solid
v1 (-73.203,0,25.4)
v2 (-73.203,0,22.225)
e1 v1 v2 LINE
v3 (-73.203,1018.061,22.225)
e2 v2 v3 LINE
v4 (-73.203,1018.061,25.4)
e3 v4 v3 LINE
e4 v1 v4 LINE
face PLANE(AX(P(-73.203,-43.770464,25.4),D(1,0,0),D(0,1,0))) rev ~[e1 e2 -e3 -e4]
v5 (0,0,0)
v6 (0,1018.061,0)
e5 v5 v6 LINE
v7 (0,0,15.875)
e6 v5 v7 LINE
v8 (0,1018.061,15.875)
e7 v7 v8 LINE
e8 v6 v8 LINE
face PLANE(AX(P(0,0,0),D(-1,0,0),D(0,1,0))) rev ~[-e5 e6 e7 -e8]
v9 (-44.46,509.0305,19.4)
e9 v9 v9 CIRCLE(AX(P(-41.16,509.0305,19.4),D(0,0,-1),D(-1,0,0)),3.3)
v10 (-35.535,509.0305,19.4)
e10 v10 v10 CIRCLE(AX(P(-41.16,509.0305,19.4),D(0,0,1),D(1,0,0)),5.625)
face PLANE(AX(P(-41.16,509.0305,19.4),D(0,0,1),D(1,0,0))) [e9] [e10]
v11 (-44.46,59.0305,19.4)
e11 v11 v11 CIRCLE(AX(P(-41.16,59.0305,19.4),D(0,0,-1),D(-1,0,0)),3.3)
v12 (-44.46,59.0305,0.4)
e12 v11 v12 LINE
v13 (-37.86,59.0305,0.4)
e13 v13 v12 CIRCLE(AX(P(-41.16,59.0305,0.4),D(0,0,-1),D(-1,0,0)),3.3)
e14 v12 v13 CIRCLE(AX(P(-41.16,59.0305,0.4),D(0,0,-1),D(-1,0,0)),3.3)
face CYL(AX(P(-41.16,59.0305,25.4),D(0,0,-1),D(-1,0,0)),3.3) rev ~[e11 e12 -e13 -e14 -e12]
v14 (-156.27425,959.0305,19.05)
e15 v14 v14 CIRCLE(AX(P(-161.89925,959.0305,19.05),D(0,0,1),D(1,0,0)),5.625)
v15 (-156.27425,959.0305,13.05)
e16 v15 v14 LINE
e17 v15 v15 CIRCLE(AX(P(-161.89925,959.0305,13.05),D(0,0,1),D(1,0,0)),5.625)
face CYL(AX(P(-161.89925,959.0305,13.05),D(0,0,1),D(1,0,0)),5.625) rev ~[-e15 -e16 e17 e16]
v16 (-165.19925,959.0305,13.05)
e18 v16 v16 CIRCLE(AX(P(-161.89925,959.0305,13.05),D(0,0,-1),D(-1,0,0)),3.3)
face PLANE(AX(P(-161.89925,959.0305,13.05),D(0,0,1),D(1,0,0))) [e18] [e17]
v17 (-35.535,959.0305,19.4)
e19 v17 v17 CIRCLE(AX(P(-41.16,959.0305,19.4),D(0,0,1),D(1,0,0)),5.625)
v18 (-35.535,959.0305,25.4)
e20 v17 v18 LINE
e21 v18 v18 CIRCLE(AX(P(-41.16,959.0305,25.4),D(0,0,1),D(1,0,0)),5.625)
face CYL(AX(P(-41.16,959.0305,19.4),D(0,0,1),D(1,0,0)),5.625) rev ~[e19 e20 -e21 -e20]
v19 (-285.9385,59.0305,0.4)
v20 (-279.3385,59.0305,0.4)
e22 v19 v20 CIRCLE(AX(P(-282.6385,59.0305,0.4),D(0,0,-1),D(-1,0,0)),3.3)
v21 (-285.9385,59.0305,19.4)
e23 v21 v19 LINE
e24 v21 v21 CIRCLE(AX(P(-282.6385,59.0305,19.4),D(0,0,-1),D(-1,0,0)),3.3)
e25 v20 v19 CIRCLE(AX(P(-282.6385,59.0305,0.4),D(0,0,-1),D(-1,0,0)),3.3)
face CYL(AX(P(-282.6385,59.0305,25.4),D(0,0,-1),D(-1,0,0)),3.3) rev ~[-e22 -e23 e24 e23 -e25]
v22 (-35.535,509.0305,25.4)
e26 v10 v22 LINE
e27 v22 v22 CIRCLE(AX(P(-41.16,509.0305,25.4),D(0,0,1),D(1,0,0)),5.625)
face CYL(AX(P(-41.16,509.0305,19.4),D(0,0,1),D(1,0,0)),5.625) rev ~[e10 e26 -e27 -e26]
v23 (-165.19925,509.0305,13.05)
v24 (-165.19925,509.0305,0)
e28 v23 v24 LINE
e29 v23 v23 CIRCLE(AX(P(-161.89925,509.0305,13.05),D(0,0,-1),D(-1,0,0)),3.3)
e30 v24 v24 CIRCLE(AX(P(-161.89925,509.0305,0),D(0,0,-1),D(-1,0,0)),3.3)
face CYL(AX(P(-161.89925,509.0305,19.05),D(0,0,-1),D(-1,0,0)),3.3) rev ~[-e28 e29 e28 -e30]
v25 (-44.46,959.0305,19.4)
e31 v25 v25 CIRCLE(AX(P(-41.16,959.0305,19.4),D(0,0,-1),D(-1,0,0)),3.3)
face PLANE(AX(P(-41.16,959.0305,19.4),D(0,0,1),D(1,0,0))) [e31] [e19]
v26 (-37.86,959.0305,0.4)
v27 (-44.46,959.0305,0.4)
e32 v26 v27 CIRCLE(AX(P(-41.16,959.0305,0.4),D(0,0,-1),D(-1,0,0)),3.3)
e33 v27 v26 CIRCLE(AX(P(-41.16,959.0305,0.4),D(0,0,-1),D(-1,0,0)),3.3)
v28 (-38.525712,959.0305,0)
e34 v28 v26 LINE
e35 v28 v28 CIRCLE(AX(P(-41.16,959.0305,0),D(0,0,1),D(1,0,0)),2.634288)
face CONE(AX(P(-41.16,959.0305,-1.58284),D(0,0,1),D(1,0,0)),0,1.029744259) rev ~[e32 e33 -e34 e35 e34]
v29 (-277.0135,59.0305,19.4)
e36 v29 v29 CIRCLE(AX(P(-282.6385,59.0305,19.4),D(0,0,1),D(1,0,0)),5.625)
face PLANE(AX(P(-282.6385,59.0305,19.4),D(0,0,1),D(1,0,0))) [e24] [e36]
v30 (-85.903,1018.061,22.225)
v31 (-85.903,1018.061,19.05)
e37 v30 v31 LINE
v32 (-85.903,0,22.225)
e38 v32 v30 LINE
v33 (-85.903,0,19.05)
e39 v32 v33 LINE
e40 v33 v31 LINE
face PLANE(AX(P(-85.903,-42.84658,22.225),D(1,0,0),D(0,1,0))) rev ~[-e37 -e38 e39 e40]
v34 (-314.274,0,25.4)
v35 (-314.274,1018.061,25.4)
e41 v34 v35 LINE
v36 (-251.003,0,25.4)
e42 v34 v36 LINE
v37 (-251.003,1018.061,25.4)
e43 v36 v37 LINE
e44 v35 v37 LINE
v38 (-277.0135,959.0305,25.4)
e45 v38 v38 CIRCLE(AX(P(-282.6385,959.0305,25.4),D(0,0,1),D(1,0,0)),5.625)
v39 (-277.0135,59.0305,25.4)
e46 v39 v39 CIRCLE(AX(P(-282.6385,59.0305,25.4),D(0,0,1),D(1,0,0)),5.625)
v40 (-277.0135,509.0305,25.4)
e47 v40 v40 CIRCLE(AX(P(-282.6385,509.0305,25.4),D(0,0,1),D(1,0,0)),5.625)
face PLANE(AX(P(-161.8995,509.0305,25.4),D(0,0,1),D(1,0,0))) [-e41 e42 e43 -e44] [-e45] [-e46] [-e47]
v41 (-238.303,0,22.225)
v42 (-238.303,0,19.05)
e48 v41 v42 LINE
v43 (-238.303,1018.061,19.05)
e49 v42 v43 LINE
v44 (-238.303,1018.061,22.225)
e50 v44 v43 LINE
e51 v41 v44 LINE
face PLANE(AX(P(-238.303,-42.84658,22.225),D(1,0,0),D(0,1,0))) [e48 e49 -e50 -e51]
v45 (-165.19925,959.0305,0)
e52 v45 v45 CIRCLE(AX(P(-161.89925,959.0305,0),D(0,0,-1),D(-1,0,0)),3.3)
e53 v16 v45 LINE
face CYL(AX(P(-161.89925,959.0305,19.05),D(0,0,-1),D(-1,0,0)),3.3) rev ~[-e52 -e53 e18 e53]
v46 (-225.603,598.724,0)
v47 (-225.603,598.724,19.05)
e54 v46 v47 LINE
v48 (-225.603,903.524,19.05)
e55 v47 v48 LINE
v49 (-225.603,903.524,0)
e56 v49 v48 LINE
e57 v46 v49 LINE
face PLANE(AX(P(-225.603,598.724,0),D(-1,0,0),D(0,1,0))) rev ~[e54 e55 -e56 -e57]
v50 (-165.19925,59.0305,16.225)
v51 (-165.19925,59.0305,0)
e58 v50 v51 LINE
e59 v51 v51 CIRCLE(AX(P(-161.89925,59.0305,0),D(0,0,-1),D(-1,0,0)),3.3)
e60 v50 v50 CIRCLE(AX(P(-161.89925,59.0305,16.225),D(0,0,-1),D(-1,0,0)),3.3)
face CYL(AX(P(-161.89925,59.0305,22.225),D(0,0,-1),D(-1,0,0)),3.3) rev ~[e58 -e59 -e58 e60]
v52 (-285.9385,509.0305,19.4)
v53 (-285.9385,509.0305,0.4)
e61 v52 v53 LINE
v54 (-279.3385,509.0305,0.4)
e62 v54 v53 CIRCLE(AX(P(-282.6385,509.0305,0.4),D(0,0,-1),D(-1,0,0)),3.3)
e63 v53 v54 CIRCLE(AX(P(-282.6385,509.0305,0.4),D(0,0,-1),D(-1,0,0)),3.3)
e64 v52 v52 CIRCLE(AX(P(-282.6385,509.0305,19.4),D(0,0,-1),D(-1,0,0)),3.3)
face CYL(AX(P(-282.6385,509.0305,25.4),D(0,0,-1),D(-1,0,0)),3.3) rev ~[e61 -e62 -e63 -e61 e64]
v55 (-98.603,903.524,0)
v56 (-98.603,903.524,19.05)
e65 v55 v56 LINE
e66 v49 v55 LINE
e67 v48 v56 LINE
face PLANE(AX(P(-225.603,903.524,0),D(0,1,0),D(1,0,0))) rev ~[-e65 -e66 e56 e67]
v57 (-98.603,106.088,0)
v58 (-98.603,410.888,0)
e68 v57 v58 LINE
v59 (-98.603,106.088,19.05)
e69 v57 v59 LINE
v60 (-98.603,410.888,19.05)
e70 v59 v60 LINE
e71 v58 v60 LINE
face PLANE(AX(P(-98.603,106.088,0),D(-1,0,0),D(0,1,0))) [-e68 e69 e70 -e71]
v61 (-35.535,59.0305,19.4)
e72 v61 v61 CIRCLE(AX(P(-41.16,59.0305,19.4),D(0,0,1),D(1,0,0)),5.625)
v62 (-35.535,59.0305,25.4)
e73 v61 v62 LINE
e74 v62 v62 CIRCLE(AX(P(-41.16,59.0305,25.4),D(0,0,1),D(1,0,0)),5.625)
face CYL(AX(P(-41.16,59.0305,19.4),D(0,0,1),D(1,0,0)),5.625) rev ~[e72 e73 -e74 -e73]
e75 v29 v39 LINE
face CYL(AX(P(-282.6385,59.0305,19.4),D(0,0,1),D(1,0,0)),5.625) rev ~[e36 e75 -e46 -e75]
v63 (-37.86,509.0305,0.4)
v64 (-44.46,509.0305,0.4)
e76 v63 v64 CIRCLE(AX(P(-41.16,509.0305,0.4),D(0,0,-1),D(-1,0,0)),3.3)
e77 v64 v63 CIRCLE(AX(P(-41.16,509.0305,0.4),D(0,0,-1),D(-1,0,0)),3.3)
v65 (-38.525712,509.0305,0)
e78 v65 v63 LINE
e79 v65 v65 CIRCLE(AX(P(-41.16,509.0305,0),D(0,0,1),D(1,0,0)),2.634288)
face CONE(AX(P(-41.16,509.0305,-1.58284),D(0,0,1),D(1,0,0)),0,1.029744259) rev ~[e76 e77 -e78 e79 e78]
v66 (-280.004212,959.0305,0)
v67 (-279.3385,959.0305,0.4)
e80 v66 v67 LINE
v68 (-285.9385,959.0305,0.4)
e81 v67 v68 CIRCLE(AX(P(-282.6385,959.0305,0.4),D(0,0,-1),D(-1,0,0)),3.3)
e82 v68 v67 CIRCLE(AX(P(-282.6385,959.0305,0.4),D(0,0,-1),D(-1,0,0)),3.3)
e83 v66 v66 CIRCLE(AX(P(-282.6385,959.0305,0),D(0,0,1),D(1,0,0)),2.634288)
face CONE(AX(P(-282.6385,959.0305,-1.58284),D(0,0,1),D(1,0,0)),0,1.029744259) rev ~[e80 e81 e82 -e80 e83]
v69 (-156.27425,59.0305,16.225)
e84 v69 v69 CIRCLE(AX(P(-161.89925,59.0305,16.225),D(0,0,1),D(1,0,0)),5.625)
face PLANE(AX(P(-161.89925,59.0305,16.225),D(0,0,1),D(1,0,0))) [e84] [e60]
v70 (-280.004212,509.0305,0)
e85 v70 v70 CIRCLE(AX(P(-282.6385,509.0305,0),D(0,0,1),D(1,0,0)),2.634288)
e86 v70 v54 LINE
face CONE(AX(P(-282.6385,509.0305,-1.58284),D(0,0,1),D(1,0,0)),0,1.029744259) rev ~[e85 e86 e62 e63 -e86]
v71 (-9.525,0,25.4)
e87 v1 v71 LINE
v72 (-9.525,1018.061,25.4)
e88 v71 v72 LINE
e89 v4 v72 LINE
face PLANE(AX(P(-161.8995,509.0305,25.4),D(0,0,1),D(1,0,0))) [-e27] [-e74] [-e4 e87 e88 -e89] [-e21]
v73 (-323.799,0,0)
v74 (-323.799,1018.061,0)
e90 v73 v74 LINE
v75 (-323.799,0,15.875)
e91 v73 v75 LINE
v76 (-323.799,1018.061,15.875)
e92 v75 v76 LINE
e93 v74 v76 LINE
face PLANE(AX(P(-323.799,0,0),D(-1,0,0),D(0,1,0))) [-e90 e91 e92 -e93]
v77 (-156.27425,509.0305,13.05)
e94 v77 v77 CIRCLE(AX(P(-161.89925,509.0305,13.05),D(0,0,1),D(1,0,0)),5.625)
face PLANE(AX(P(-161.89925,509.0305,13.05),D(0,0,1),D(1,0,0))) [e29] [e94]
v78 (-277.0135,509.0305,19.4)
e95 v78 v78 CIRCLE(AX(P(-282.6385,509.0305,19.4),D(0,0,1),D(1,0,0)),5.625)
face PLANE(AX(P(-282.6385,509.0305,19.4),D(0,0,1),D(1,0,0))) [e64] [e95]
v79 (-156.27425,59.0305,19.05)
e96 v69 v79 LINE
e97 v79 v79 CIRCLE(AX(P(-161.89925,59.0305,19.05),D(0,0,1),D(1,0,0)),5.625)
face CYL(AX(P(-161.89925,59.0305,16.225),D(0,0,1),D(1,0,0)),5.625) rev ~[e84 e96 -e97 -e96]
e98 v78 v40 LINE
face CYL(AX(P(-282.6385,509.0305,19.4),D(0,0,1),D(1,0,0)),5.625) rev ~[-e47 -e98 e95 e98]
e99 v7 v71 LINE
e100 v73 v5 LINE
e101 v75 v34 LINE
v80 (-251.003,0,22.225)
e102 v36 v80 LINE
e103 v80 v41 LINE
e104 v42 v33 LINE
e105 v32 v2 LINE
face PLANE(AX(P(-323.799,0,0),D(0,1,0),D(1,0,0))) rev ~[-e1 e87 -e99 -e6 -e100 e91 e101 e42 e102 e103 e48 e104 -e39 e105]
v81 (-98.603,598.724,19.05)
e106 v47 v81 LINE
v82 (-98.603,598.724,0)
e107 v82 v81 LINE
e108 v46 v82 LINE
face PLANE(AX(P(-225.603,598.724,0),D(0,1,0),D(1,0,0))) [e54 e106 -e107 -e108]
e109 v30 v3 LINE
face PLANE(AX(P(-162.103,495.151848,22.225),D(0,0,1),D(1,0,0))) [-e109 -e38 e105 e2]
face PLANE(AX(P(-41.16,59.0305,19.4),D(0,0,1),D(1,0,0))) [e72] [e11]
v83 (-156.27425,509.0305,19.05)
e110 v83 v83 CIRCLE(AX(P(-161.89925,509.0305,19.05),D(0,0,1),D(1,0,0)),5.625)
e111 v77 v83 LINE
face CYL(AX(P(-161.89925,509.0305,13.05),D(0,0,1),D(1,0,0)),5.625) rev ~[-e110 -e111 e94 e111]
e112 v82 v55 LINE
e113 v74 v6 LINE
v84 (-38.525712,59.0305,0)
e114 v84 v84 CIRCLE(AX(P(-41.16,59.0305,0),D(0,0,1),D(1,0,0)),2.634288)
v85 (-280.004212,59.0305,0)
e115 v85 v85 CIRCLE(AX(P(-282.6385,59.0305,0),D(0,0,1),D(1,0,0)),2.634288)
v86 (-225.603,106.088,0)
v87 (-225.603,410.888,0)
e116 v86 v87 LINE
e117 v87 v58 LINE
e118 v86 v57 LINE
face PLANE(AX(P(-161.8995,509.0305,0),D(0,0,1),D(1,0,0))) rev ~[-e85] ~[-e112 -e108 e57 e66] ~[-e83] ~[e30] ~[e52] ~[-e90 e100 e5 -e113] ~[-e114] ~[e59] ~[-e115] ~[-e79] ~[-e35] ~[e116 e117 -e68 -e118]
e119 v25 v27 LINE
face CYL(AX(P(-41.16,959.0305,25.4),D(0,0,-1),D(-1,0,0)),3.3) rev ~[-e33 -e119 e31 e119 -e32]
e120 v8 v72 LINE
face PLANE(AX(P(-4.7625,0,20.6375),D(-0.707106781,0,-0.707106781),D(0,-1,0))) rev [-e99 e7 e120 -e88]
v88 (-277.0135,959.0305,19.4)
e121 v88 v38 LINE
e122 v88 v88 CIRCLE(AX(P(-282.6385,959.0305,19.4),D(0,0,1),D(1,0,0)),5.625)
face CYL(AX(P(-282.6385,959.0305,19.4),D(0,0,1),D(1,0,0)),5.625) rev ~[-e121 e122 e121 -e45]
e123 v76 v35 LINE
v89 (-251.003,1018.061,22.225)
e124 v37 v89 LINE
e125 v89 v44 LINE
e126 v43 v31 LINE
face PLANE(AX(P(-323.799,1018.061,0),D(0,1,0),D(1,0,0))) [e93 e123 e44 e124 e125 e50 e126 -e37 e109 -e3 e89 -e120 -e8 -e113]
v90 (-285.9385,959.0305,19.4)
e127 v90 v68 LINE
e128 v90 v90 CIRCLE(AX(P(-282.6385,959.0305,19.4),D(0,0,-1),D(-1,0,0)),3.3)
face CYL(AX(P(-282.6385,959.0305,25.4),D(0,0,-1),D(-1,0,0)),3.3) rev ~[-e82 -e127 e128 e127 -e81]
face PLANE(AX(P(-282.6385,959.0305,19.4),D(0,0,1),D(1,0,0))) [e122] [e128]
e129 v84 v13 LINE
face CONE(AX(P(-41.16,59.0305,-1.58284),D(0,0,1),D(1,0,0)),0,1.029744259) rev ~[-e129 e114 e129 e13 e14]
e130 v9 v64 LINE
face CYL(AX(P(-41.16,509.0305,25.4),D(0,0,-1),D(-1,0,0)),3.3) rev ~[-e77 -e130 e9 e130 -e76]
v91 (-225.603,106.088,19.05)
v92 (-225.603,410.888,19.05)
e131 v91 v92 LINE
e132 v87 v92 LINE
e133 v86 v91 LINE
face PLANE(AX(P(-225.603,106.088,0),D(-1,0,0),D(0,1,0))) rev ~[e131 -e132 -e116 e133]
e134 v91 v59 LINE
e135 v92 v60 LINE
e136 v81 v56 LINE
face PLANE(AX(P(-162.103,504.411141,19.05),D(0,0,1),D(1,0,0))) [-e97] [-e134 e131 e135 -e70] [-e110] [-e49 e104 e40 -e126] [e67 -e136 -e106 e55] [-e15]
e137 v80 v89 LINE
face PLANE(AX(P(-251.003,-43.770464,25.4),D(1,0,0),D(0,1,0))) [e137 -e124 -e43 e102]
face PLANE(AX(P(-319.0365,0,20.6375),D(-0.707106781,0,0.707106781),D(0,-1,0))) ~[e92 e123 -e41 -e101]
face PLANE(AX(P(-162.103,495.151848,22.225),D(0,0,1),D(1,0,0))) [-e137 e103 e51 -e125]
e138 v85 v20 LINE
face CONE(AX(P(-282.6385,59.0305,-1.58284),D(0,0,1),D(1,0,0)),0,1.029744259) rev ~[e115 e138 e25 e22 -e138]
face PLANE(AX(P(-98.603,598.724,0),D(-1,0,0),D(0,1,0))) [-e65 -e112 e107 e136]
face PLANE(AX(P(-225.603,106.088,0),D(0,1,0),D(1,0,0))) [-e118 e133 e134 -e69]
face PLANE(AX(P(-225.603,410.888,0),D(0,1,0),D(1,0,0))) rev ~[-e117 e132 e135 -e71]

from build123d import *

# Parameters (mm, degrees)
F0_W                   = 323.799
F0_H                   = 1018.061
F0_W_2                 = 127
F0_H_2                 = 304.8
F1_DEPTH               = 25.4
F2_W                   = 177.8
F2_H                   = 1077.8446237831
F3_DEPTH               = 3.175
F4_W                   = 152.4
F4_H                   = 1094.5154423737
F5_DEPTH               = 3.175
F6_SIZE                = 9.525
F8_D                   = 6.6
F8_DEPTH               = 25
F8_CBORE_D             = 11.25
F8_CBORE_DEPTH         = 6
F8_TIP                 = 1.9828400428
F10_D                  = 6.6
F10_DEPTH              = 25
F10_CBORE_D            = 11.25
F10_CBORE_DEPTH        = 6
F10_TIP                = 1.9828400428
F13_D                  = 6.6
F13_CBORE_D            = 11.25
F13_CBORE_DEPTH        = 6
F13_ON_F12_D           = 6.6
F13_ON_F12_CBORE_D     = 11.25
F13_ON_F12_CBORE_DEPTH = 6


# Not quite as in the source:
# - a feature names something its author has since deleted; it is built from what else it names


with BuildPart() as f1:
    # F0 (on Top) → F1 (new body)
    with BuildSketch(Plane.XY):
        with Locations((-161.8995, 509.0305)):
            Rectangle(F0_W, F0_H)
        with Locations((-162.103, 258.488)):
            Rectangle(F0_W_2, F0_H_2, mode=Mode.SUBTRACT)
        with Locations((-162.103, 751.124)):
            Rectangle(F0_W_2, F0_H_2, mode=Mode.SUBTRACT)
    extrude(amount=F1_DEPTH)

    # F2 (on face) → F3 (cut)
    with BuildSketch(Plane.XY.offset(25.4)):
        with Locations((-162.103, 495.1518476009)):
            Rectangle(F2_W, F2_H)
    extrude(amount=-F3_DEPTH, mode=Mode.SUBTRACT)

    # F4 (on face) → F5 (cut)
    with BuildSketch(Plane.XY.offset(22.225)):
        with Locations((-162.103, 504.4111407595)):
            Rectangle(F4_W, F4_H)
    extrude(amount=-F5_DEPTH, mode=Mode.SUBTRACT)

    # F6
    f6_edges = [f1.edges().sort_by_distance(p)[0] for p in [
        (-323.799, 509.0305, 25.4),
        (0, 509.0305, 25.4),
    ]]
    chamfer(f6_edges, length=F6_SIZE)

    # F8
    with Locations(Plane.XY.offset(25.4)):
        with Locations((-41.16, 59.0305), (-41.16, 509.0305), (-41.16, 959.0305)):
            CounterBoreHole(F8_D / 2, F8_CBORE_D / 2, F8_CBORE_DEPTH, depth=F8_DEPTH)
            with Locations((0, 0, -(F8_DEPTH + F8_TIP / 2))):  # 118° drill point
                Cone(0, F8_D / 2, F8_TIP, mode=Mode.SUBTRACT)

    # F10
    with Locations(Plane.XY.offset(25.4)):
        with Locations((-282.6385, 59.0305), (-282.6385, 509.0305), (-282.6385, 959.0305)):
            CounterBoreHole(F10_D / 2, F10_CBORE_D / 2, F10_CBORE_DEPTH, depth=F10_DEPTH)
            with Locations((0, 0, -(F10_DEPTH + F10_TIP / 2))):  # 118° drill point
                Cone(0, F10_D / 2, F10_TIP, mode=Mode.SUBTRACT)

    # F13 (through all)
    with Locations(Plane.XY.offset(22.225)):
        with Locations((-161.89925, 59.0305)):
            CounterBoreHole(F13_D / 2, F13_CBORE_D / 2, F13_CBORE_DEPTH)

    # F13 on F12 (through all)
    with Locations(Plane.XY.offset(19.05)):
        with Locations((-161.89925, 509.0305), (-161.89925, 959.0305)):
            CounterBoreHole(F13_ON_F12_D / 2, F13_ON_F12_CBORE_D / 2, F13_ON_F12_CBORE_DEPTH)


solid = f1.part
